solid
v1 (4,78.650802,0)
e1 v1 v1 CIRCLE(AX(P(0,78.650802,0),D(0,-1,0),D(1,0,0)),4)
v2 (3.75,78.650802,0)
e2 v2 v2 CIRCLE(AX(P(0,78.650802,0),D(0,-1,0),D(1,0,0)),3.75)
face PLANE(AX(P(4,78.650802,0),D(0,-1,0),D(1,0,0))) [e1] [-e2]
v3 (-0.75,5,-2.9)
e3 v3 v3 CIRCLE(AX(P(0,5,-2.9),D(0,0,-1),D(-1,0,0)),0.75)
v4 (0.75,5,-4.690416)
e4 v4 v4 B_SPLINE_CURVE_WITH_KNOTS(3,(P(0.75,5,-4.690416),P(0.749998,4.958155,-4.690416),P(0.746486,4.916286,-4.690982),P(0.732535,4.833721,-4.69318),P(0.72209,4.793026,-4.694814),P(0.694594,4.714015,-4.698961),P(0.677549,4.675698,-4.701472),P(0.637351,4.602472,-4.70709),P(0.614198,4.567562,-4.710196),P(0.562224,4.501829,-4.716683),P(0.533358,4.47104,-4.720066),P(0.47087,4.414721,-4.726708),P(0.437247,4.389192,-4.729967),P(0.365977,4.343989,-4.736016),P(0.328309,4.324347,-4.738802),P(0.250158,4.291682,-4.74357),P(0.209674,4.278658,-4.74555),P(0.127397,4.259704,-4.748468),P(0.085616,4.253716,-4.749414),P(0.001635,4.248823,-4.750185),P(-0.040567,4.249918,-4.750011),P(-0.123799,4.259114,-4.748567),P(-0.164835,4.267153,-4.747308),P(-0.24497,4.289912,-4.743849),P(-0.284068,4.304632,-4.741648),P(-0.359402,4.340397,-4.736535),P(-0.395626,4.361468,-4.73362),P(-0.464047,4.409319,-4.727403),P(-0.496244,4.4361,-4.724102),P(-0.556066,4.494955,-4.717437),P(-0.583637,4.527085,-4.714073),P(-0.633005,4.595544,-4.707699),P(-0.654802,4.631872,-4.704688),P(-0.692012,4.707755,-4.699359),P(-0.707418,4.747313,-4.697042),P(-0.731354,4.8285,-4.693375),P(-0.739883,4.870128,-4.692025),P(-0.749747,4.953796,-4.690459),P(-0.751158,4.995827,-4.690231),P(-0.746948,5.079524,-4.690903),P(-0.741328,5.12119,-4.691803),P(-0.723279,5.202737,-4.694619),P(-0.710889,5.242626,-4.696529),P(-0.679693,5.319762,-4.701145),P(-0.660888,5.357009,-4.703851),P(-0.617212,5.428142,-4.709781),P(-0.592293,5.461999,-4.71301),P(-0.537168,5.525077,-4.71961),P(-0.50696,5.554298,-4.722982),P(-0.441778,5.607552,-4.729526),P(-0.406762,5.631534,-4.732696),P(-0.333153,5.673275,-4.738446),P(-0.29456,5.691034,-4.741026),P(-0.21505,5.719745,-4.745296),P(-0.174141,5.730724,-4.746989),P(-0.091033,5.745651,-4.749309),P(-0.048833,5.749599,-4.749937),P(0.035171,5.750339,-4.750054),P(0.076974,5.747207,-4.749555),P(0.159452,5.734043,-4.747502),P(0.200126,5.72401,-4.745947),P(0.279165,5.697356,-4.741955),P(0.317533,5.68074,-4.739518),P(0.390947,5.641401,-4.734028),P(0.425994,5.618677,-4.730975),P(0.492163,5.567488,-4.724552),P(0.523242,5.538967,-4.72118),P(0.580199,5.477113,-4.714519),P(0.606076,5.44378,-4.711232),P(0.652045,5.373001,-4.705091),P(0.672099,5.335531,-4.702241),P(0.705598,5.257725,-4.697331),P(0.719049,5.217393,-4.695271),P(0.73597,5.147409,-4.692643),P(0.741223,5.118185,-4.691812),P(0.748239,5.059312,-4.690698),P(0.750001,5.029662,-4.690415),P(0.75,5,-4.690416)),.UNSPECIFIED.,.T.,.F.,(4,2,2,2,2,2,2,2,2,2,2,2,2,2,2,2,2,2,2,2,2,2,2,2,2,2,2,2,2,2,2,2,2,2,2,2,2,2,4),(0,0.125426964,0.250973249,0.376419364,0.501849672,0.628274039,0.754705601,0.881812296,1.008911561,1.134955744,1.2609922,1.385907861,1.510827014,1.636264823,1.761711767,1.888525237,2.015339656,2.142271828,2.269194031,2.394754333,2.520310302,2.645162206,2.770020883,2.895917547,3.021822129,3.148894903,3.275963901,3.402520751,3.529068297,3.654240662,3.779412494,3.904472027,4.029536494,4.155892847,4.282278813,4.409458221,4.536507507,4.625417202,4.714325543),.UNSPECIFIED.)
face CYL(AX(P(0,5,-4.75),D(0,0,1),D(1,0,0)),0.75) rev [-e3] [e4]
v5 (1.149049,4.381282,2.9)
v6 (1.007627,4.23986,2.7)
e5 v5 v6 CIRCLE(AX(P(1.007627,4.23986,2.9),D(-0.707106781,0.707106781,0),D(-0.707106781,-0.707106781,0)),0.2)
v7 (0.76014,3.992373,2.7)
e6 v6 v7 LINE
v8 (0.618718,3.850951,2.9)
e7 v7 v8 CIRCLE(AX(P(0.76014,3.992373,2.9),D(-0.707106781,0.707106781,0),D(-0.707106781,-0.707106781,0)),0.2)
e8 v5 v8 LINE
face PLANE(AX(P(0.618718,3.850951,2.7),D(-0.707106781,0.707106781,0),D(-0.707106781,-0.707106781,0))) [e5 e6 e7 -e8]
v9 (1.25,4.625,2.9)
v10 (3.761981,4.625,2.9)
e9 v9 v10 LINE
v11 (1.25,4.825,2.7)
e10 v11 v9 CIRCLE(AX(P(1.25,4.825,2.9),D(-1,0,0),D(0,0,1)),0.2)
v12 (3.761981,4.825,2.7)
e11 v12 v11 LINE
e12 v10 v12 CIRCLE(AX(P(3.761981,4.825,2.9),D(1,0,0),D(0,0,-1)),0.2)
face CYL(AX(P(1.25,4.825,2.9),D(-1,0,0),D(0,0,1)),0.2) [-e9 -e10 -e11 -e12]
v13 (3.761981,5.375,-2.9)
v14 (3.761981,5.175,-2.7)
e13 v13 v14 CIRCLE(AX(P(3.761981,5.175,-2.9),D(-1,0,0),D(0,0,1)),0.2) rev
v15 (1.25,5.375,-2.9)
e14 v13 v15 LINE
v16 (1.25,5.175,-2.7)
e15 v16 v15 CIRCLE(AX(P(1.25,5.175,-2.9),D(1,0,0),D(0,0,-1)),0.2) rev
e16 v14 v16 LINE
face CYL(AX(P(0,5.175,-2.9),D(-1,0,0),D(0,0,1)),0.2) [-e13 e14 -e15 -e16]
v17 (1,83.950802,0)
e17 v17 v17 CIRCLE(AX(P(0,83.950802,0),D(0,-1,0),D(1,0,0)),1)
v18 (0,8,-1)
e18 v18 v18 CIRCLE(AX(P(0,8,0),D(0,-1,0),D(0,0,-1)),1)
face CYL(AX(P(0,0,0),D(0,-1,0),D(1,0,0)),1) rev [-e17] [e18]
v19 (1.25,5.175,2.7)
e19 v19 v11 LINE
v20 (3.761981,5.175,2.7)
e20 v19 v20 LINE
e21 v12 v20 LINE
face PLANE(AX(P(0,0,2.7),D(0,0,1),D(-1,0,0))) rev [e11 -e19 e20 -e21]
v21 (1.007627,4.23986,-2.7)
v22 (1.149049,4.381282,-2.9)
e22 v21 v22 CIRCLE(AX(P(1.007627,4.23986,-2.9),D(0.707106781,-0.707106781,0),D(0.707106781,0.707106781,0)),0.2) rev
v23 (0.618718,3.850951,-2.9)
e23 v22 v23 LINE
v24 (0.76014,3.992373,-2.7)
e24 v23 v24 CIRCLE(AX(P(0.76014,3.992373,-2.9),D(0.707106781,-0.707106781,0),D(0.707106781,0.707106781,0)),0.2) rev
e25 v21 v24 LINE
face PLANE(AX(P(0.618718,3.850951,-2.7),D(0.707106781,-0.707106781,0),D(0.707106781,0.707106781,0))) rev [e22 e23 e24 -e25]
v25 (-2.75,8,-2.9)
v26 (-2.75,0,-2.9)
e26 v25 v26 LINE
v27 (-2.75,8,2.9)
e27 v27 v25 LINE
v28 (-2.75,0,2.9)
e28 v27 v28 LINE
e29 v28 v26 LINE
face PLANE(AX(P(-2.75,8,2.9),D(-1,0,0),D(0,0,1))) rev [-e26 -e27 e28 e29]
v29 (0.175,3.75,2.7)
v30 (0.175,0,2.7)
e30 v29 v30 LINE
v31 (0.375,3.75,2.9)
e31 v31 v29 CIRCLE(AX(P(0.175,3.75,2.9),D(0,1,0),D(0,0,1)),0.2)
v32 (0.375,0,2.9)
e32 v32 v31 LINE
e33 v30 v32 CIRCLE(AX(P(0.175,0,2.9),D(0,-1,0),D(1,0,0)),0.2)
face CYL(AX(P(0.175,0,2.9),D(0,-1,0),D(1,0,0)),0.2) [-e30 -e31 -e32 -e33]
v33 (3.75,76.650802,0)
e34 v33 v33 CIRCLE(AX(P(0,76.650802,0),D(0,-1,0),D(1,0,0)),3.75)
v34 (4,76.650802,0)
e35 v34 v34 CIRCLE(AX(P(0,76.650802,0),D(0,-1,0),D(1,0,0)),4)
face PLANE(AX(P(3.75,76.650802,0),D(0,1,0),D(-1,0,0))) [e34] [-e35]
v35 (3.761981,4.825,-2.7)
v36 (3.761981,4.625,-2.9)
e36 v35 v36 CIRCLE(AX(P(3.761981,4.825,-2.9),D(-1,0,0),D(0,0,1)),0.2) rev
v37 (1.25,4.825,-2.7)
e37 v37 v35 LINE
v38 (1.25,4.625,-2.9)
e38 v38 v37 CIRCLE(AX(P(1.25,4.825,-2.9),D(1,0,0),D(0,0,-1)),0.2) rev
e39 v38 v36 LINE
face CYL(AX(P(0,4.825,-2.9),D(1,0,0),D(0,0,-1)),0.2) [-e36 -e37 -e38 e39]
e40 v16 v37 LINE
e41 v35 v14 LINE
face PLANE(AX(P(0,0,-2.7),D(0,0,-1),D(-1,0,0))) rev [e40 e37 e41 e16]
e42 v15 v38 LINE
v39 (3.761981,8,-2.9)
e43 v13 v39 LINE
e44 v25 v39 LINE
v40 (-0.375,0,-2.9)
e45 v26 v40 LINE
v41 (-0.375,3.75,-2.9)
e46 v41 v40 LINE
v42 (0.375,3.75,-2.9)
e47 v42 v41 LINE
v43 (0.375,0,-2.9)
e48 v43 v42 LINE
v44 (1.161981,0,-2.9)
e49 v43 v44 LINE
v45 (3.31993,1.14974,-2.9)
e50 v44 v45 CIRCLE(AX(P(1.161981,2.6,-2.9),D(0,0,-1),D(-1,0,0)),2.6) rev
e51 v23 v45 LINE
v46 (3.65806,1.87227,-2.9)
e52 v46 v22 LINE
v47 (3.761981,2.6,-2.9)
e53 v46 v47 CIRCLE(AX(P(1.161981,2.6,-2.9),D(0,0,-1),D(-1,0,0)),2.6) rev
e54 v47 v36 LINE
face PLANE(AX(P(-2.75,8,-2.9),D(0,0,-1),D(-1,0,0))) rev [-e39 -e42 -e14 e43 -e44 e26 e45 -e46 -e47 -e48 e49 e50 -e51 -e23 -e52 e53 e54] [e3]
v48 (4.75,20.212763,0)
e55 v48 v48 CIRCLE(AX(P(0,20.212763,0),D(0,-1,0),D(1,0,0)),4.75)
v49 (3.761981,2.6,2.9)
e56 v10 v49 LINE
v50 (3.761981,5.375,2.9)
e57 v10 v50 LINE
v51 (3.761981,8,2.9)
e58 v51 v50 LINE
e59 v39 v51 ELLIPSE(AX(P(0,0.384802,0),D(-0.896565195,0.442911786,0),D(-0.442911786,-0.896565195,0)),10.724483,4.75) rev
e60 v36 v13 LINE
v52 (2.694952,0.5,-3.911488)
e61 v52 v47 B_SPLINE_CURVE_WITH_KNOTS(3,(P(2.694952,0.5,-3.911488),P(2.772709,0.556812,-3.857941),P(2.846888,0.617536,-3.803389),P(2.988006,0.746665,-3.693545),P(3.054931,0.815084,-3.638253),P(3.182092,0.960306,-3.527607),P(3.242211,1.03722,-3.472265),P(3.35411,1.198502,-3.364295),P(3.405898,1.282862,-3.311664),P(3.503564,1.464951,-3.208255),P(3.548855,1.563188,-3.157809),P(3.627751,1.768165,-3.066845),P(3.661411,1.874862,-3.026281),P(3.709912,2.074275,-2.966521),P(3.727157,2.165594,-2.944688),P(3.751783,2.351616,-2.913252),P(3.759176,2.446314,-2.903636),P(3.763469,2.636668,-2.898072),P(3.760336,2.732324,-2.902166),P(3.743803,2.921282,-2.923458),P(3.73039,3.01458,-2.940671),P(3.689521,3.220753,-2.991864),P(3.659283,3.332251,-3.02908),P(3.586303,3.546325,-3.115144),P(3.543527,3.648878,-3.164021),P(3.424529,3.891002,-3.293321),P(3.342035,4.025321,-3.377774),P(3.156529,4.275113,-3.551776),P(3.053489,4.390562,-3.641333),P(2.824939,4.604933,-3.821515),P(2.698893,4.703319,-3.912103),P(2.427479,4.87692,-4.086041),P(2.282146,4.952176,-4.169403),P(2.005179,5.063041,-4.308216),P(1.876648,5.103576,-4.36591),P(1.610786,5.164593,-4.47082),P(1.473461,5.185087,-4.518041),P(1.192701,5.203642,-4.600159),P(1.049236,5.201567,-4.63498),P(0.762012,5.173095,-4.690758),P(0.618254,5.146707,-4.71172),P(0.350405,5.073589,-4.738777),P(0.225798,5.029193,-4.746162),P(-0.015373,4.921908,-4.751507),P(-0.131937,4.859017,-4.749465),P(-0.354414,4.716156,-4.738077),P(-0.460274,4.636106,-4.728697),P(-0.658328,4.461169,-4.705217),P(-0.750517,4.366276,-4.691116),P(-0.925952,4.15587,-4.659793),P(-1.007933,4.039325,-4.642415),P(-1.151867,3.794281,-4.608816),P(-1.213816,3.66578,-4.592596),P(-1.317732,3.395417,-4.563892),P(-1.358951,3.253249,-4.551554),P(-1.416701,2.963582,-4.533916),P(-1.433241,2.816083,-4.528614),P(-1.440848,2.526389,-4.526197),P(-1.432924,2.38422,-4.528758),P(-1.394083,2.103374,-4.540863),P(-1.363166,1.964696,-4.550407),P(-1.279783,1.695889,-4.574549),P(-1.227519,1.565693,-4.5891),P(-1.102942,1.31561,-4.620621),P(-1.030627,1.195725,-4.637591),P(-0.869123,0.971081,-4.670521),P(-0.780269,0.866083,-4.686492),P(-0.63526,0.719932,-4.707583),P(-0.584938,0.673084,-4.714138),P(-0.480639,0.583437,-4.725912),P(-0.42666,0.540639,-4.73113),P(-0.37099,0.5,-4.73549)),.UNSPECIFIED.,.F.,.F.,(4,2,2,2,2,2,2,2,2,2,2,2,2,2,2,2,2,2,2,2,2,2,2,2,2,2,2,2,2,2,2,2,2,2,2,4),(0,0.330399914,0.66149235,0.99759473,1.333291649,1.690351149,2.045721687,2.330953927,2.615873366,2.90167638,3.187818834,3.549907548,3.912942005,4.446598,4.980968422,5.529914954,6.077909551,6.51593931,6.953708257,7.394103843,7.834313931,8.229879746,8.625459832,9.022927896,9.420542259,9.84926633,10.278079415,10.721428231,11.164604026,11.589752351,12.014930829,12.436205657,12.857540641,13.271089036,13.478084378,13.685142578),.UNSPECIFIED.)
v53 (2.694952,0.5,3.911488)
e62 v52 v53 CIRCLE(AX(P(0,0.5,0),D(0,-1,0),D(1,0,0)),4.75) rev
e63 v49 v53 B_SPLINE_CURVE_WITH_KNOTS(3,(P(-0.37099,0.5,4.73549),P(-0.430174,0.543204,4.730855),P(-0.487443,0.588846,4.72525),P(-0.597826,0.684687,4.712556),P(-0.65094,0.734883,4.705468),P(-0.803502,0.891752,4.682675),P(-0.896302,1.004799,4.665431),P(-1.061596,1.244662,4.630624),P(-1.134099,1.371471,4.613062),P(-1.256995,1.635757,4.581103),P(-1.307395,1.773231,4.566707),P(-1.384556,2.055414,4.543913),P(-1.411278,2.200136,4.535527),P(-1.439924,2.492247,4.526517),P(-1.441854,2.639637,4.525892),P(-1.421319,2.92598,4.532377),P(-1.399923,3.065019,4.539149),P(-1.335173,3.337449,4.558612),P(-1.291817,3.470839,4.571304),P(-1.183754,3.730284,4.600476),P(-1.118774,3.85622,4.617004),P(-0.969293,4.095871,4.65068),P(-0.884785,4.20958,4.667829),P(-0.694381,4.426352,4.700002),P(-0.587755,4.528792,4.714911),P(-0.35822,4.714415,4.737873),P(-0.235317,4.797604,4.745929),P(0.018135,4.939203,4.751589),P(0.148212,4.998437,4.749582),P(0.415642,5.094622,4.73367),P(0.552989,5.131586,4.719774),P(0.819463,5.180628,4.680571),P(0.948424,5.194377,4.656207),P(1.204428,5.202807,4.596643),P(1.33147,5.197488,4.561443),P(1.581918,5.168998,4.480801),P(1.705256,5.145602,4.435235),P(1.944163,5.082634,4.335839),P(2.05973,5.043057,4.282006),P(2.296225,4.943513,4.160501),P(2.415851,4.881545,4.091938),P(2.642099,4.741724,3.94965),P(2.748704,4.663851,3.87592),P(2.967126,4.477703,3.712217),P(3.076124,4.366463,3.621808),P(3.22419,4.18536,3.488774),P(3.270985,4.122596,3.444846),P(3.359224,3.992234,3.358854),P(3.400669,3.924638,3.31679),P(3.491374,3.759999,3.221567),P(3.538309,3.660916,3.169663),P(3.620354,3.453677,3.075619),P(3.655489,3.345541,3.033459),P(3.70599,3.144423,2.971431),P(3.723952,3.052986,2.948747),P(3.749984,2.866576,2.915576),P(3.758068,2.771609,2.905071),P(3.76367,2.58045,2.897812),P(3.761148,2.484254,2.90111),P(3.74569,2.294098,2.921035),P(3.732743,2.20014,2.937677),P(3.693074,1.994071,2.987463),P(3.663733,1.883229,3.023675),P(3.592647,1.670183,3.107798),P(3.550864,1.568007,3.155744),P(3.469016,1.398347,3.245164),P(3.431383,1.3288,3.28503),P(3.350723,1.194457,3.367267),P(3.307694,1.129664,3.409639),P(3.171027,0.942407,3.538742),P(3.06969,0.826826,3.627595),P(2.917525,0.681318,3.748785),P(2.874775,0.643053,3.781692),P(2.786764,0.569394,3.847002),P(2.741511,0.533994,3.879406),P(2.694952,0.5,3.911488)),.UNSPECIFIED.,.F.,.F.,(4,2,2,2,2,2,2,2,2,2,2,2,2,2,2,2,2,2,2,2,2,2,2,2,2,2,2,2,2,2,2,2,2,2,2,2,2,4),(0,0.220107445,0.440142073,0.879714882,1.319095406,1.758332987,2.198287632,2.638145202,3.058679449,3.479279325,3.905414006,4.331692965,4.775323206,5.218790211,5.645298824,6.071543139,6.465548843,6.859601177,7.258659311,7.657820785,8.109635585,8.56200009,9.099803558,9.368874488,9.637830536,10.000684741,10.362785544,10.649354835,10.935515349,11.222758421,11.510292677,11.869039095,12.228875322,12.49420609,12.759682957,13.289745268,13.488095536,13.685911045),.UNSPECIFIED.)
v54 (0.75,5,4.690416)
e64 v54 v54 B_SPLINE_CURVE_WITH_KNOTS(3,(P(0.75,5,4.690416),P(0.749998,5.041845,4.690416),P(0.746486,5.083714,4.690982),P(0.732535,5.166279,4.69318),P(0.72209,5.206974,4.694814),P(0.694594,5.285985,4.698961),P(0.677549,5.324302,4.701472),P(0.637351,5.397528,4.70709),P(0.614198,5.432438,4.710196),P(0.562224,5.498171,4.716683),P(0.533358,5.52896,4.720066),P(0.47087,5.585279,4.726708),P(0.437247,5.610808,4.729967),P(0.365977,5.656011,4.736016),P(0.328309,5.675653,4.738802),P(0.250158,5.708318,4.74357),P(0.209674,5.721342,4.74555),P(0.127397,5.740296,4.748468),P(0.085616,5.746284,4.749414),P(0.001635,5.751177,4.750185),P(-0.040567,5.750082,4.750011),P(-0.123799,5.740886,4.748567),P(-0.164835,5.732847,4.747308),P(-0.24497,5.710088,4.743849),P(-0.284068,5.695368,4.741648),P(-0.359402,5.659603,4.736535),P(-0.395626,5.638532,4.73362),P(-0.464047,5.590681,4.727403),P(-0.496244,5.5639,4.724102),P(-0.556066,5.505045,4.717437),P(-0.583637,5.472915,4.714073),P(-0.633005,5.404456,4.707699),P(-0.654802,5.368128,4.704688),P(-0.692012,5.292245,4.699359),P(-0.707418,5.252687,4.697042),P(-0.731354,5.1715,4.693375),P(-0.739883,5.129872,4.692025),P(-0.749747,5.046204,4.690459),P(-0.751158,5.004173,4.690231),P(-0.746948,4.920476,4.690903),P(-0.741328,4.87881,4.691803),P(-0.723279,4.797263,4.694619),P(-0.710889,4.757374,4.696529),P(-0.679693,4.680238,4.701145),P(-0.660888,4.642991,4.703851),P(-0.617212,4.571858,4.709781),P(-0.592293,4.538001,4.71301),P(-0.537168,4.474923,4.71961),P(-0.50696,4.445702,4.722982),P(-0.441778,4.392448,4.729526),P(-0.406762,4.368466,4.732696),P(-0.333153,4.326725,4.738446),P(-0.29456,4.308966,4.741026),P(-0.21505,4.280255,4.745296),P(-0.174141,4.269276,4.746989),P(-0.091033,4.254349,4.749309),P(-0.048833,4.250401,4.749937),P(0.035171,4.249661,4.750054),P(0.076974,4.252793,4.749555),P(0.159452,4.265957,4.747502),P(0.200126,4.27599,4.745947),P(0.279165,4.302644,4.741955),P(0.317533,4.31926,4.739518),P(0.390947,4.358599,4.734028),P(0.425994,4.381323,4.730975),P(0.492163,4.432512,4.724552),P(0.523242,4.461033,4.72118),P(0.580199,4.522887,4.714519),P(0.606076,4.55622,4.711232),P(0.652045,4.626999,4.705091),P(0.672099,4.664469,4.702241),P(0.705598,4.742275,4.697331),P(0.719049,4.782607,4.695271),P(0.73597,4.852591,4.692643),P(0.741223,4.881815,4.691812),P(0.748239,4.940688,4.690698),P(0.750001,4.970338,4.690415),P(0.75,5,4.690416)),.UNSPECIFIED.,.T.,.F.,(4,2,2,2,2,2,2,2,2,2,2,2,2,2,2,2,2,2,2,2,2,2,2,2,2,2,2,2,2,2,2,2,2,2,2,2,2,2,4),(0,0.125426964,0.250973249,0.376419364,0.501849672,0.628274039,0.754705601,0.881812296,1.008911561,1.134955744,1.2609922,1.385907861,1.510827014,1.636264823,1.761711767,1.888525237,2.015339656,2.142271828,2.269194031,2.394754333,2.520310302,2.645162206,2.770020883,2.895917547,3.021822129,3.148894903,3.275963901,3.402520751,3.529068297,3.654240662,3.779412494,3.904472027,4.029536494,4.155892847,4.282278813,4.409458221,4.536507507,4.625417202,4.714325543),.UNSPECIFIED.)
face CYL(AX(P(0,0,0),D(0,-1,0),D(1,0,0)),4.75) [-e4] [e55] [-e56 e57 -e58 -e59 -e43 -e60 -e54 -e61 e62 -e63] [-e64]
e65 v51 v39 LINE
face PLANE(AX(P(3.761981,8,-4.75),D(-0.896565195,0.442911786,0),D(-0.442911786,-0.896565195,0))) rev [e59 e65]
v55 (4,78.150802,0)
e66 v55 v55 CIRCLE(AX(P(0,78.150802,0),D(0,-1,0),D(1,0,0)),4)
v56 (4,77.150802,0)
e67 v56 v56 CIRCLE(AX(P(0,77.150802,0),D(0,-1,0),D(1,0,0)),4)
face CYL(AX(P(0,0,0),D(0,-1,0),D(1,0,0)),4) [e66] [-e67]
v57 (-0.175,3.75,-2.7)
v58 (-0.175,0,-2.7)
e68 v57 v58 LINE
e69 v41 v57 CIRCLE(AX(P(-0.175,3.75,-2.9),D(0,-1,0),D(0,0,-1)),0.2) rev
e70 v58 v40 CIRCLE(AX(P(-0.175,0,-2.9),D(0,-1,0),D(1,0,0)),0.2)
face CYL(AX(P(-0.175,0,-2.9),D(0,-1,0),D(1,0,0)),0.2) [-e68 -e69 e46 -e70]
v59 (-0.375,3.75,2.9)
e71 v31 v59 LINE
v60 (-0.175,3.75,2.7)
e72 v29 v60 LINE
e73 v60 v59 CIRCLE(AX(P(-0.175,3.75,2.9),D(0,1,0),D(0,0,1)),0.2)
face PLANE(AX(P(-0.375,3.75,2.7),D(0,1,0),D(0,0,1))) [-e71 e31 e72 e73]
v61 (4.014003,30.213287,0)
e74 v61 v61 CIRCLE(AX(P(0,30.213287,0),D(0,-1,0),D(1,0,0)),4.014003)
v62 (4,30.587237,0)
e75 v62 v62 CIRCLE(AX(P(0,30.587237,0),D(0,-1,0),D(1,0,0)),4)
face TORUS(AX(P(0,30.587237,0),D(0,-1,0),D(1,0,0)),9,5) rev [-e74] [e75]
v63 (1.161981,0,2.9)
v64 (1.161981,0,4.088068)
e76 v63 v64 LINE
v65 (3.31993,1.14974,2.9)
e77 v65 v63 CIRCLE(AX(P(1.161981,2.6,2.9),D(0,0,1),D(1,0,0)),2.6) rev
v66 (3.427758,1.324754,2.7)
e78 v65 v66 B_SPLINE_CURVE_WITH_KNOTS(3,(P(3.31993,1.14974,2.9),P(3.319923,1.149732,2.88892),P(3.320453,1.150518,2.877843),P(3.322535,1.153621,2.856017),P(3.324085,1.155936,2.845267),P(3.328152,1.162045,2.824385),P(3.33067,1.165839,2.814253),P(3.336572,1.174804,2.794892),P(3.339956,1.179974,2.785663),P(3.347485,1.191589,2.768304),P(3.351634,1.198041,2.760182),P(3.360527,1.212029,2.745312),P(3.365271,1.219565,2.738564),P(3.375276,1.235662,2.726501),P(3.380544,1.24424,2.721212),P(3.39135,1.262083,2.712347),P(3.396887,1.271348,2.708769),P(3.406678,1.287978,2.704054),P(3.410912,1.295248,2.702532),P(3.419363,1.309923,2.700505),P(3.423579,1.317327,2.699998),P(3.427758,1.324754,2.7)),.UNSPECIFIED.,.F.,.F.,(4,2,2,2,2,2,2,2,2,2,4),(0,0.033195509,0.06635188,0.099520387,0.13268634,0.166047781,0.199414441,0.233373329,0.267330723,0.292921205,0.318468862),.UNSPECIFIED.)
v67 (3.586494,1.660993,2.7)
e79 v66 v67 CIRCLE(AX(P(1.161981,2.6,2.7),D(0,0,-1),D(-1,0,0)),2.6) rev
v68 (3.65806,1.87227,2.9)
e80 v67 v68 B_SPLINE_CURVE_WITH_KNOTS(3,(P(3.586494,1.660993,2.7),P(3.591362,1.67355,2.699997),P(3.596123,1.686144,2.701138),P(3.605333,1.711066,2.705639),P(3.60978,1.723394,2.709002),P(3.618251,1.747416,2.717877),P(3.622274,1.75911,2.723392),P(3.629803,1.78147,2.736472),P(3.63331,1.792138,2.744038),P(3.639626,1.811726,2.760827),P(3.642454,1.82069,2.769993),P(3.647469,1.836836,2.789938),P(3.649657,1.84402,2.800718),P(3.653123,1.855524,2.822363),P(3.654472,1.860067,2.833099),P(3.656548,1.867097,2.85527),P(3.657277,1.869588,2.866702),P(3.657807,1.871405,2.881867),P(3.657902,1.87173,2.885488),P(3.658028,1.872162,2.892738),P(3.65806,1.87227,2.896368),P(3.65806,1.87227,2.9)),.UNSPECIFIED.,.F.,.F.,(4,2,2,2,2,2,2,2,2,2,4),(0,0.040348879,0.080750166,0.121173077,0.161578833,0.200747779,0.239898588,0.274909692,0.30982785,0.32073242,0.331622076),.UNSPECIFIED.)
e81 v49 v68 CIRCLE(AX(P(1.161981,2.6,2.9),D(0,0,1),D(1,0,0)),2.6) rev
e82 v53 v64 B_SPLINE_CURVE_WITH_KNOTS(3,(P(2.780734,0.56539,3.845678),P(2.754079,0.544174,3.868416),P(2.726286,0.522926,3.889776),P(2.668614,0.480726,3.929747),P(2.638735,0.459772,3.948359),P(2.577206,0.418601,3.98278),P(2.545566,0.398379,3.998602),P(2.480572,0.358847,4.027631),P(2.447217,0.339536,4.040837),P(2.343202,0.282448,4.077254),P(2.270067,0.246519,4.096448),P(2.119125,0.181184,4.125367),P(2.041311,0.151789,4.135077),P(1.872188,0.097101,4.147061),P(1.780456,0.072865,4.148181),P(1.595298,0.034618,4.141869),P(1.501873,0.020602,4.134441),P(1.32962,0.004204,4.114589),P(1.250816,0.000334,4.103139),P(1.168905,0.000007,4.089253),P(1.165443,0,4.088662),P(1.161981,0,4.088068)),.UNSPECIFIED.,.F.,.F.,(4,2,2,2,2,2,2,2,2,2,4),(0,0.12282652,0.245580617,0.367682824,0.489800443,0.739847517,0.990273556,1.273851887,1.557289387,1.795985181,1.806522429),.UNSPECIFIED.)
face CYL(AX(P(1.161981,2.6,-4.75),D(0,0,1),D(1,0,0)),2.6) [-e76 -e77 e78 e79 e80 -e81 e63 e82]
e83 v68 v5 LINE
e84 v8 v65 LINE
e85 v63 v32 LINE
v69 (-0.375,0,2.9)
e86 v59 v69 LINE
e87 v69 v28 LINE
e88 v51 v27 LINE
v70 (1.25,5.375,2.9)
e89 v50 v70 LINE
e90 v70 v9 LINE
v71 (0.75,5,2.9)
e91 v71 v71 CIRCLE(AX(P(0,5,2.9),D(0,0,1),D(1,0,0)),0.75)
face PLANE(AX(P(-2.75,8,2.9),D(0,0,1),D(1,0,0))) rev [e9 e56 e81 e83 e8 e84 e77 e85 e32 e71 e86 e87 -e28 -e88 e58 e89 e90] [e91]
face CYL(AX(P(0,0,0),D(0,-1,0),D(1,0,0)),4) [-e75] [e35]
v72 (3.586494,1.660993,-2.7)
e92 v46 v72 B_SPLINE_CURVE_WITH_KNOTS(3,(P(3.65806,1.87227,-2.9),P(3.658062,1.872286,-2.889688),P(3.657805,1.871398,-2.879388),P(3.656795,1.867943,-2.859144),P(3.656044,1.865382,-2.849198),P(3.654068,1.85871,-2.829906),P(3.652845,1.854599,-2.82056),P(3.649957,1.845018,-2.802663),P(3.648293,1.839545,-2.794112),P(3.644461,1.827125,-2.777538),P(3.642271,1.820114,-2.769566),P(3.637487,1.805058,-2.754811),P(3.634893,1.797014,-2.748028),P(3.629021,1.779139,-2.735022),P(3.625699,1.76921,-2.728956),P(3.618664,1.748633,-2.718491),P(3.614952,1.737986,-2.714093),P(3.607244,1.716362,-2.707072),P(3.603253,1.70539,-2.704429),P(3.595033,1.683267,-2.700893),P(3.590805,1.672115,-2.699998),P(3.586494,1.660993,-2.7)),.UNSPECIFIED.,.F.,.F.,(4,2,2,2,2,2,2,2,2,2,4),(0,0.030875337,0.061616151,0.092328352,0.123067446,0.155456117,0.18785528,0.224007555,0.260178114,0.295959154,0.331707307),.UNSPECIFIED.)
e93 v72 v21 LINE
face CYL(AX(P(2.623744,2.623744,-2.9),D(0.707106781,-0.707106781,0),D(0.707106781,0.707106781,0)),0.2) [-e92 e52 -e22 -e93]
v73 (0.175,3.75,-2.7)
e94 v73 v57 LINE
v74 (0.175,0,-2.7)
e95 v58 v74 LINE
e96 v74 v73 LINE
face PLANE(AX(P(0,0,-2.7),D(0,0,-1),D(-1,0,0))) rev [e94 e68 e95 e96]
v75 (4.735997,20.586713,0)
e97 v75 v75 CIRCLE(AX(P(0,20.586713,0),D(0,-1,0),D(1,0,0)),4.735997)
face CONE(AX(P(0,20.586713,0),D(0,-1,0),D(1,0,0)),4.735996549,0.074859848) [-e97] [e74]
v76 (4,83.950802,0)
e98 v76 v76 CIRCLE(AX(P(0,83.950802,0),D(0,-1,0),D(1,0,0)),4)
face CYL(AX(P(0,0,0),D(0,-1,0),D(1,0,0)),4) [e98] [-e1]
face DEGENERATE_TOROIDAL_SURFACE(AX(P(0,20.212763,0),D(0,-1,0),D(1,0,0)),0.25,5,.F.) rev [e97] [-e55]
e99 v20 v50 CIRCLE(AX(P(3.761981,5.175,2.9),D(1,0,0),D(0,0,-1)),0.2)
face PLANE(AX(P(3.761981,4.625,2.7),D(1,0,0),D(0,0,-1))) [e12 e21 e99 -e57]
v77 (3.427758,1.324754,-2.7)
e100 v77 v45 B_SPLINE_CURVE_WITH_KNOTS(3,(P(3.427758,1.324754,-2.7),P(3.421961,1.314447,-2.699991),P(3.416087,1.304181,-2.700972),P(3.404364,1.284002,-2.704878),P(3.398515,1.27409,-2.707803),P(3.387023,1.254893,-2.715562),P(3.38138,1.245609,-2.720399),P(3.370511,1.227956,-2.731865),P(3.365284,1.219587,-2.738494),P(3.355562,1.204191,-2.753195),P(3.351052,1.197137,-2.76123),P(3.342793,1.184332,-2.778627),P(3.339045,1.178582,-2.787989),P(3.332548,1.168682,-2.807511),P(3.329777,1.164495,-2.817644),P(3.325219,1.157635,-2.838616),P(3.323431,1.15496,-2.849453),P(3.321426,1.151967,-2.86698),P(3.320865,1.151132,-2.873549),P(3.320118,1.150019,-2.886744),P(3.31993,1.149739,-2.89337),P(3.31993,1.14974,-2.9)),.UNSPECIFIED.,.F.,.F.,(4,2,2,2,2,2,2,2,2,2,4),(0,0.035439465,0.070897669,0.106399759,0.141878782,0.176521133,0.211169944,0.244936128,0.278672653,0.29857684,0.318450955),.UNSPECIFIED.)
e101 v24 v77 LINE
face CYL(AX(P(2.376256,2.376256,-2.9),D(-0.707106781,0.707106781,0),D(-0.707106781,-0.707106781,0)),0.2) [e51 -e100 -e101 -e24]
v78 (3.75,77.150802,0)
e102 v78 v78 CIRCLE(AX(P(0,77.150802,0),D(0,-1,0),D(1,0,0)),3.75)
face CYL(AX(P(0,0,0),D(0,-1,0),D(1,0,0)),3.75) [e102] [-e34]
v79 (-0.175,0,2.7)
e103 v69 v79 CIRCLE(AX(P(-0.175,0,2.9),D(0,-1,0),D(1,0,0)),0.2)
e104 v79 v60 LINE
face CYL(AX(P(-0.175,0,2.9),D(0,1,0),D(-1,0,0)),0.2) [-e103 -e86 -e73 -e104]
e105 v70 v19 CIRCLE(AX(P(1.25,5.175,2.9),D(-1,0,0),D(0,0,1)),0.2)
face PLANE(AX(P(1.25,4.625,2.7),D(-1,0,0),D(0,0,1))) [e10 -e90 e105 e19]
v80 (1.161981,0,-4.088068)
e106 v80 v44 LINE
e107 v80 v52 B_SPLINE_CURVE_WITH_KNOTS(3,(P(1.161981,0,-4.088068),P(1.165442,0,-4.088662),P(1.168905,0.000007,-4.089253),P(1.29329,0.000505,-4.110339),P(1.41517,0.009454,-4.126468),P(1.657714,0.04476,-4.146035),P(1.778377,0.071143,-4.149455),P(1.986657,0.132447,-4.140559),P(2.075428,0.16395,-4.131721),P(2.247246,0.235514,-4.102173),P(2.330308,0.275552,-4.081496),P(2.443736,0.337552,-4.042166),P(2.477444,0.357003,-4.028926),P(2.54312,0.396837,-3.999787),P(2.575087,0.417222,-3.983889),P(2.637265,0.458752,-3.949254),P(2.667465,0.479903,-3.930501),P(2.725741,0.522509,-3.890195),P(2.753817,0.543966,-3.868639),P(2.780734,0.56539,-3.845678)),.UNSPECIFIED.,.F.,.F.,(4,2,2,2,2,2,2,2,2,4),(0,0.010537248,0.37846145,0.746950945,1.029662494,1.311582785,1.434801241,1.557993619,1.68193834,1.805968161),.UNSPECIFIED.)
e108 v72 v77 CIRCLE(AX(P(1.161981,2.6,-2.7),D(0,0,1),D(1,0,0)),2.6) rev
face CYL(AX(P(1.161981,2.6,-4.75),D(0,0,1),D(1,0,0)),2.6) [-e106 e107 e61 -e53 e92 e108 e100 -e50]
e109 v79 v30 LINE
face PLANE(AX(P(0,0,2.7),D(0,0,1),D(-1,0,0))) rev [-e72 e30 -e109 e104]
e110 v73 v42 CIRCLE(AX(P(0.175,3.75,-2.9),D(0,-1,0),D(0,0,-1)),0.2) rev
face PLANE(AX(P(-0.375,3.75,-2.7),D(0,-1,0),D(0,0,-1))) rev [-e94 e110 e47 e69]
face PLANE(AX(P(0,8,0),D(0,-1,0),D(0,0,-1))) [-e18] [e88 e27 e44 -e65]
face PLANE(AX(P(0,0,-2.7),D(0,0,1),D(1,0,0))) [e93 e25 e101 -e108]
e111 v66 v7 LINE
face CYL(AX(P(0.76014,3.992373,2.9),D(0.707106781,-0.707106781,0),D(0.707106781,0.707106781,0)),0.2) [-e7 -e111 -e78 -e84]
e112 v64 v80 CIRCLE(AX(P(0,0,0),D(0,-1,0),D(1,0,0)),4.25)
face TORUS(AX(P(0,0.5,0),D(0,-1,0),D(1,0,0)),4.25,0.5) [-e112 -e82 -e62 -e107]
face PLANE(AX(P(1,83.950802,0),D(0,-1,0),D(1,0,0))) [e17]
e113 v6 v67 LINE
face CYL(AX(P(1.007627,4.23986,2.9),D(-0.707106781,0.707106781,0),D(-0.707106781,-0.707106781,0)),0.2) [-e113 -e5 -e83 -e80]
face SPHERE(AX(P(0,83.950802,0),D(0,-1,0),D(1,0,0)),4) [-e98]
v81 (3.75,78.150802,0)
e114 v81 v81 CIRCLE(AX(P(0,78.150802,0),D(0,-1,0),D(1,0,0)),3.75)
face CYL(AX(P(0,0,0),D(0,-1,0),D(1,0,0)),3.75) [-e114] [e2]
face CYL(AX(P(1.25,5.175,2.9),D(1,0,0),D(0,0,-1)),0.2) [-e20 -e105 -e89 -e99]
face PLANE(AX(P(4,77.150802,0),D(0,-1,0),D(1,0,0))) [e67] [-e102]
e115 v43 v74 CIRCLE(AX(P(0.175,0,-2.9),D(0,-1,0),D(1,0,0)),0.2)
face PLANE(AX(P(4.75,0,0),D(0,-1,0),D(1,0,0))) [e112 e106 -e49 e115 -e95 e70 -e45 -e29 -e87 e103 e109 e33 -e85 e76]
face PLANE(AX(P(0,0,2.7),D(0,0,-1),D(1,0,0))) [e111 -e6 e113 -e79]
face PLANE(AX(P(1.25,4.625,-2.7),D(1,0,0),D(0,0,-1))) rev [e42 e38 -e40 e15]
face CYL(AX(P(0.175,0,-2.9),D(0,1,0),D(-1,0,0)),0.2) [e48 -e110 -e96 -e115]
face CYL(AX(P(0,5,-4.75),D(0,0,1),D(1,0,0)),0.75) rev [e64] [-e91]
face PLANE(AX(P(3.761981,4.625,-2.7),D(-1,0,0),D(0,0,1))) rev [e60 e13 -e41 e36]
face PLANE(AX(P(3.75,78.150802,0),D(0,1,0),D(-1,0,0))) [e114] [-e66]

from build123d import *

# Parameters (mm, degrees)
ESQUISSE3_W                  = 7.5
ESQUISSE3_H                  = 5.8
ENL_V_MAT_EXTRU_1_DEPTH      = 8
CONG_1_R                     = 0.5
ENL_V_MAT_EXTRU_2_DEPTH      = 89.206964432
ENL_V_MAT_EXTRU_2_DEPTH_BACK = 89.206964432
ESQUISSE4_R                  = 0.75
ESQUISSE5_W                  = 0.75
ESQUISSE5_H                  = 3.75
ESQUISSE5_W_2                = 2.511980861
ESQUISSE5_H_2                = 0.75
BOSS_EXTRU_1_DEPTH           = 0.2
CONG_2_R                     = 0.2
CONG_2_OF_SYM_TRIE1_R        = 0.2
ENL_V_MAT_EXTRU_3_DEPTH      = 89.410568231


with BuildPart() as part:
    # Esquisse2 → Révolution1 (revolve)
    with BuildSketch(Plane.XY):
        with BuildLine():
            Line((4.014003451, 30.213287326), (4.735996549, 20.586712674))
            ThreePointArc((4.735996549, 20.586712674), (4.746497911, 20.399868856), (4.75, 20.212762933))
            Line((4.75, 20.212762933), (4.75, 0))
            Line((4.75, 0), (1, 0))
            Line((1, 0), (1, 83.950802))
            Line((1, 83.950802), (0, 83.950802))
            Line((0, 83.950802), (0, 87.950802))
            ThreePointArc((0, 87.950802), (2.828427125, 86.779229125), (4, 83.950802))
            Line((4, 83.950802), (4, 78.650802))
            Line((4, 78.650802), (3.75, 78.650802))
            Line((3.75, 78.650802), (3.75, 78.150802))
            Line((3.75, 78.150802), (4, 78.150802))
            Line((4, 78.150802), (4, 77.150802))
            Line((4, 77.150802), (3.75, 77.150802))
            Line((3.75, 77.150802), (3.75, 76.650802))
            Line((3.75, 76.650802), (4, 76.650802))
            Line((4, 76.650802), (4, 30.587237067))
            ThreePointArc((4, 30.587237067), (4.003502089, 30.400131144), (4.014003451, 30.213287326))
        make_face()
    revolve(axis=Axis((0, 0, 0), (0, 1, 0)))

    # Esquisse3 → Enlèv. mat.-Extru.1 (cut)
    with BuildSketch(Plane.XZ):
        with Locations((1, 0)):
            Rectangle(ESQUISSE3_W, ESQUISSE3_H)
    extrude(amount=-ENL_V_MAT_EXTRU_1_DEPTH, mode=Mode.SUBTRACT)

    # Congé1
    cong_1_edges = [part.edges().sort_by_distance(p)[0] for p in [
        (-4.75, 0, 0),
    ]]
    fillet(cong_1_edges, radius=CONG_1_R)

    # Esquisse4 → Enlèv. mat.-Extru.2 (cut, two sides: drawn at the far end of the back side and taken through both)
    with BuildSketch(Plane.XY.offset(-ENL_V_MAT_EXTRU_2_DEPTH_BACK)):
        with Locations((0, 5)):
            Circle(ESQUISSE4_R)
        with BuildLine():
            Line((1.161980861, 0), (3.761980861, 0))
            Line((3.761980861, 0), (3.761980861, 2.6))
            ThreePointArc((3.761980861, 2.6), (3.000458492, 0.761522369), (1.161980861, 0))
        make_face()
        Polygon((3.761980861, 8), (4.75, 10), (4.75, 8), align=None)
    extrude(amount=ENL_V_MAT_EXTRU_2_DEPTH + ENL_V_MAT_EXTRU_2_DEPTH_BACK, mode=Mode.SUBTRACT)

    # Esquisse5 → Boss.-Extru.1 (add)
    with BuildSketch(Plane.XY.offset(-2.9)):
        with Locations((0, 1.875)):
            Rectangle(ESQUISSE5_W, ESQUISSE5_H)
        Polygon((0.618718434, 3.850951481), (1.149048519, 4.381281566), (4.027145904, 1.503184182), (3.496815818, 0.972854096), align=None)
        with Locations((2.50599043, 5)):
            Rectangle(ESQUISSE5_W_2, ESQUISSE5_H_2)
    boss_extru_1 = extrude(amount=BOSS_EXTRU_1_DEPTH)

    # Congé2
    cong_2_edges = [part.edges().sort_by_distance(p)[0] for p in [
        (2.505990431, 5.375, -2.7),
        (2.505990431, 4.625, -2.7),
        (2.588097212, 2.942232874, -2.7),
        (2.057767126, 2.411902788, -2.7),
        (-0.375, 1.875, -2.7),
        (0.375, 1.875, -2.7),
    ]]
    fillet(cong_2_edges, radius=CONG_2_R - 0.0001)  # a hair under: the kernel refuses the full size

    # Symétrie1: Boss.-Extru.1 across plane
    add(boss_extru_1.mirror(Plane.XY))

    # Congé2 of Symétrie1
    cong_2_of_sym_trie1_edges = [part.edges().sort_by_distance(p)[0] for p in [
        (2.505990431, 5.375, 2.7),
        (2.505990431, 4.625, 2.7),
        (2.588097212, 2.942232874, 2.7),
        (2.057767126, 2.411902788, 2.7),
        (-0.375, 1.875, 2.7),
        (0.375, 1.875, 2.7),
    ]]
    fillet(cong_2_of_sym_trie1_edges, radius=CONG_2_OF_SYM_TRIE1_R - 0.0001)  # a hair under: the kernel refuses the full size

    # Esquisse6 → Enlèv. mat.-Extru.3 (cut, through all)
    with BuildSketch(Plane.XY.offset(2.9)):
        with BuildLine():
            Line((4.027145904, 1.503184182), (3.658059706, 1.87227038))
            ThreePointArc((3.658059706, 1.87227038), (3.516870908, 1.49795968), (3.319930166, 1.149739748))
            Line((3.319930166, 1.149739748), (3.496815818, 0.972854096))
            Line((3.496815818, 0.972854096), (4.027145904, 1.503184182))
        make_face()
    extrude(amount=-ENL_V_MAT_EXTRU_3_DEPTH, mode=Mode.SUBTRACT)


solid = part.part
